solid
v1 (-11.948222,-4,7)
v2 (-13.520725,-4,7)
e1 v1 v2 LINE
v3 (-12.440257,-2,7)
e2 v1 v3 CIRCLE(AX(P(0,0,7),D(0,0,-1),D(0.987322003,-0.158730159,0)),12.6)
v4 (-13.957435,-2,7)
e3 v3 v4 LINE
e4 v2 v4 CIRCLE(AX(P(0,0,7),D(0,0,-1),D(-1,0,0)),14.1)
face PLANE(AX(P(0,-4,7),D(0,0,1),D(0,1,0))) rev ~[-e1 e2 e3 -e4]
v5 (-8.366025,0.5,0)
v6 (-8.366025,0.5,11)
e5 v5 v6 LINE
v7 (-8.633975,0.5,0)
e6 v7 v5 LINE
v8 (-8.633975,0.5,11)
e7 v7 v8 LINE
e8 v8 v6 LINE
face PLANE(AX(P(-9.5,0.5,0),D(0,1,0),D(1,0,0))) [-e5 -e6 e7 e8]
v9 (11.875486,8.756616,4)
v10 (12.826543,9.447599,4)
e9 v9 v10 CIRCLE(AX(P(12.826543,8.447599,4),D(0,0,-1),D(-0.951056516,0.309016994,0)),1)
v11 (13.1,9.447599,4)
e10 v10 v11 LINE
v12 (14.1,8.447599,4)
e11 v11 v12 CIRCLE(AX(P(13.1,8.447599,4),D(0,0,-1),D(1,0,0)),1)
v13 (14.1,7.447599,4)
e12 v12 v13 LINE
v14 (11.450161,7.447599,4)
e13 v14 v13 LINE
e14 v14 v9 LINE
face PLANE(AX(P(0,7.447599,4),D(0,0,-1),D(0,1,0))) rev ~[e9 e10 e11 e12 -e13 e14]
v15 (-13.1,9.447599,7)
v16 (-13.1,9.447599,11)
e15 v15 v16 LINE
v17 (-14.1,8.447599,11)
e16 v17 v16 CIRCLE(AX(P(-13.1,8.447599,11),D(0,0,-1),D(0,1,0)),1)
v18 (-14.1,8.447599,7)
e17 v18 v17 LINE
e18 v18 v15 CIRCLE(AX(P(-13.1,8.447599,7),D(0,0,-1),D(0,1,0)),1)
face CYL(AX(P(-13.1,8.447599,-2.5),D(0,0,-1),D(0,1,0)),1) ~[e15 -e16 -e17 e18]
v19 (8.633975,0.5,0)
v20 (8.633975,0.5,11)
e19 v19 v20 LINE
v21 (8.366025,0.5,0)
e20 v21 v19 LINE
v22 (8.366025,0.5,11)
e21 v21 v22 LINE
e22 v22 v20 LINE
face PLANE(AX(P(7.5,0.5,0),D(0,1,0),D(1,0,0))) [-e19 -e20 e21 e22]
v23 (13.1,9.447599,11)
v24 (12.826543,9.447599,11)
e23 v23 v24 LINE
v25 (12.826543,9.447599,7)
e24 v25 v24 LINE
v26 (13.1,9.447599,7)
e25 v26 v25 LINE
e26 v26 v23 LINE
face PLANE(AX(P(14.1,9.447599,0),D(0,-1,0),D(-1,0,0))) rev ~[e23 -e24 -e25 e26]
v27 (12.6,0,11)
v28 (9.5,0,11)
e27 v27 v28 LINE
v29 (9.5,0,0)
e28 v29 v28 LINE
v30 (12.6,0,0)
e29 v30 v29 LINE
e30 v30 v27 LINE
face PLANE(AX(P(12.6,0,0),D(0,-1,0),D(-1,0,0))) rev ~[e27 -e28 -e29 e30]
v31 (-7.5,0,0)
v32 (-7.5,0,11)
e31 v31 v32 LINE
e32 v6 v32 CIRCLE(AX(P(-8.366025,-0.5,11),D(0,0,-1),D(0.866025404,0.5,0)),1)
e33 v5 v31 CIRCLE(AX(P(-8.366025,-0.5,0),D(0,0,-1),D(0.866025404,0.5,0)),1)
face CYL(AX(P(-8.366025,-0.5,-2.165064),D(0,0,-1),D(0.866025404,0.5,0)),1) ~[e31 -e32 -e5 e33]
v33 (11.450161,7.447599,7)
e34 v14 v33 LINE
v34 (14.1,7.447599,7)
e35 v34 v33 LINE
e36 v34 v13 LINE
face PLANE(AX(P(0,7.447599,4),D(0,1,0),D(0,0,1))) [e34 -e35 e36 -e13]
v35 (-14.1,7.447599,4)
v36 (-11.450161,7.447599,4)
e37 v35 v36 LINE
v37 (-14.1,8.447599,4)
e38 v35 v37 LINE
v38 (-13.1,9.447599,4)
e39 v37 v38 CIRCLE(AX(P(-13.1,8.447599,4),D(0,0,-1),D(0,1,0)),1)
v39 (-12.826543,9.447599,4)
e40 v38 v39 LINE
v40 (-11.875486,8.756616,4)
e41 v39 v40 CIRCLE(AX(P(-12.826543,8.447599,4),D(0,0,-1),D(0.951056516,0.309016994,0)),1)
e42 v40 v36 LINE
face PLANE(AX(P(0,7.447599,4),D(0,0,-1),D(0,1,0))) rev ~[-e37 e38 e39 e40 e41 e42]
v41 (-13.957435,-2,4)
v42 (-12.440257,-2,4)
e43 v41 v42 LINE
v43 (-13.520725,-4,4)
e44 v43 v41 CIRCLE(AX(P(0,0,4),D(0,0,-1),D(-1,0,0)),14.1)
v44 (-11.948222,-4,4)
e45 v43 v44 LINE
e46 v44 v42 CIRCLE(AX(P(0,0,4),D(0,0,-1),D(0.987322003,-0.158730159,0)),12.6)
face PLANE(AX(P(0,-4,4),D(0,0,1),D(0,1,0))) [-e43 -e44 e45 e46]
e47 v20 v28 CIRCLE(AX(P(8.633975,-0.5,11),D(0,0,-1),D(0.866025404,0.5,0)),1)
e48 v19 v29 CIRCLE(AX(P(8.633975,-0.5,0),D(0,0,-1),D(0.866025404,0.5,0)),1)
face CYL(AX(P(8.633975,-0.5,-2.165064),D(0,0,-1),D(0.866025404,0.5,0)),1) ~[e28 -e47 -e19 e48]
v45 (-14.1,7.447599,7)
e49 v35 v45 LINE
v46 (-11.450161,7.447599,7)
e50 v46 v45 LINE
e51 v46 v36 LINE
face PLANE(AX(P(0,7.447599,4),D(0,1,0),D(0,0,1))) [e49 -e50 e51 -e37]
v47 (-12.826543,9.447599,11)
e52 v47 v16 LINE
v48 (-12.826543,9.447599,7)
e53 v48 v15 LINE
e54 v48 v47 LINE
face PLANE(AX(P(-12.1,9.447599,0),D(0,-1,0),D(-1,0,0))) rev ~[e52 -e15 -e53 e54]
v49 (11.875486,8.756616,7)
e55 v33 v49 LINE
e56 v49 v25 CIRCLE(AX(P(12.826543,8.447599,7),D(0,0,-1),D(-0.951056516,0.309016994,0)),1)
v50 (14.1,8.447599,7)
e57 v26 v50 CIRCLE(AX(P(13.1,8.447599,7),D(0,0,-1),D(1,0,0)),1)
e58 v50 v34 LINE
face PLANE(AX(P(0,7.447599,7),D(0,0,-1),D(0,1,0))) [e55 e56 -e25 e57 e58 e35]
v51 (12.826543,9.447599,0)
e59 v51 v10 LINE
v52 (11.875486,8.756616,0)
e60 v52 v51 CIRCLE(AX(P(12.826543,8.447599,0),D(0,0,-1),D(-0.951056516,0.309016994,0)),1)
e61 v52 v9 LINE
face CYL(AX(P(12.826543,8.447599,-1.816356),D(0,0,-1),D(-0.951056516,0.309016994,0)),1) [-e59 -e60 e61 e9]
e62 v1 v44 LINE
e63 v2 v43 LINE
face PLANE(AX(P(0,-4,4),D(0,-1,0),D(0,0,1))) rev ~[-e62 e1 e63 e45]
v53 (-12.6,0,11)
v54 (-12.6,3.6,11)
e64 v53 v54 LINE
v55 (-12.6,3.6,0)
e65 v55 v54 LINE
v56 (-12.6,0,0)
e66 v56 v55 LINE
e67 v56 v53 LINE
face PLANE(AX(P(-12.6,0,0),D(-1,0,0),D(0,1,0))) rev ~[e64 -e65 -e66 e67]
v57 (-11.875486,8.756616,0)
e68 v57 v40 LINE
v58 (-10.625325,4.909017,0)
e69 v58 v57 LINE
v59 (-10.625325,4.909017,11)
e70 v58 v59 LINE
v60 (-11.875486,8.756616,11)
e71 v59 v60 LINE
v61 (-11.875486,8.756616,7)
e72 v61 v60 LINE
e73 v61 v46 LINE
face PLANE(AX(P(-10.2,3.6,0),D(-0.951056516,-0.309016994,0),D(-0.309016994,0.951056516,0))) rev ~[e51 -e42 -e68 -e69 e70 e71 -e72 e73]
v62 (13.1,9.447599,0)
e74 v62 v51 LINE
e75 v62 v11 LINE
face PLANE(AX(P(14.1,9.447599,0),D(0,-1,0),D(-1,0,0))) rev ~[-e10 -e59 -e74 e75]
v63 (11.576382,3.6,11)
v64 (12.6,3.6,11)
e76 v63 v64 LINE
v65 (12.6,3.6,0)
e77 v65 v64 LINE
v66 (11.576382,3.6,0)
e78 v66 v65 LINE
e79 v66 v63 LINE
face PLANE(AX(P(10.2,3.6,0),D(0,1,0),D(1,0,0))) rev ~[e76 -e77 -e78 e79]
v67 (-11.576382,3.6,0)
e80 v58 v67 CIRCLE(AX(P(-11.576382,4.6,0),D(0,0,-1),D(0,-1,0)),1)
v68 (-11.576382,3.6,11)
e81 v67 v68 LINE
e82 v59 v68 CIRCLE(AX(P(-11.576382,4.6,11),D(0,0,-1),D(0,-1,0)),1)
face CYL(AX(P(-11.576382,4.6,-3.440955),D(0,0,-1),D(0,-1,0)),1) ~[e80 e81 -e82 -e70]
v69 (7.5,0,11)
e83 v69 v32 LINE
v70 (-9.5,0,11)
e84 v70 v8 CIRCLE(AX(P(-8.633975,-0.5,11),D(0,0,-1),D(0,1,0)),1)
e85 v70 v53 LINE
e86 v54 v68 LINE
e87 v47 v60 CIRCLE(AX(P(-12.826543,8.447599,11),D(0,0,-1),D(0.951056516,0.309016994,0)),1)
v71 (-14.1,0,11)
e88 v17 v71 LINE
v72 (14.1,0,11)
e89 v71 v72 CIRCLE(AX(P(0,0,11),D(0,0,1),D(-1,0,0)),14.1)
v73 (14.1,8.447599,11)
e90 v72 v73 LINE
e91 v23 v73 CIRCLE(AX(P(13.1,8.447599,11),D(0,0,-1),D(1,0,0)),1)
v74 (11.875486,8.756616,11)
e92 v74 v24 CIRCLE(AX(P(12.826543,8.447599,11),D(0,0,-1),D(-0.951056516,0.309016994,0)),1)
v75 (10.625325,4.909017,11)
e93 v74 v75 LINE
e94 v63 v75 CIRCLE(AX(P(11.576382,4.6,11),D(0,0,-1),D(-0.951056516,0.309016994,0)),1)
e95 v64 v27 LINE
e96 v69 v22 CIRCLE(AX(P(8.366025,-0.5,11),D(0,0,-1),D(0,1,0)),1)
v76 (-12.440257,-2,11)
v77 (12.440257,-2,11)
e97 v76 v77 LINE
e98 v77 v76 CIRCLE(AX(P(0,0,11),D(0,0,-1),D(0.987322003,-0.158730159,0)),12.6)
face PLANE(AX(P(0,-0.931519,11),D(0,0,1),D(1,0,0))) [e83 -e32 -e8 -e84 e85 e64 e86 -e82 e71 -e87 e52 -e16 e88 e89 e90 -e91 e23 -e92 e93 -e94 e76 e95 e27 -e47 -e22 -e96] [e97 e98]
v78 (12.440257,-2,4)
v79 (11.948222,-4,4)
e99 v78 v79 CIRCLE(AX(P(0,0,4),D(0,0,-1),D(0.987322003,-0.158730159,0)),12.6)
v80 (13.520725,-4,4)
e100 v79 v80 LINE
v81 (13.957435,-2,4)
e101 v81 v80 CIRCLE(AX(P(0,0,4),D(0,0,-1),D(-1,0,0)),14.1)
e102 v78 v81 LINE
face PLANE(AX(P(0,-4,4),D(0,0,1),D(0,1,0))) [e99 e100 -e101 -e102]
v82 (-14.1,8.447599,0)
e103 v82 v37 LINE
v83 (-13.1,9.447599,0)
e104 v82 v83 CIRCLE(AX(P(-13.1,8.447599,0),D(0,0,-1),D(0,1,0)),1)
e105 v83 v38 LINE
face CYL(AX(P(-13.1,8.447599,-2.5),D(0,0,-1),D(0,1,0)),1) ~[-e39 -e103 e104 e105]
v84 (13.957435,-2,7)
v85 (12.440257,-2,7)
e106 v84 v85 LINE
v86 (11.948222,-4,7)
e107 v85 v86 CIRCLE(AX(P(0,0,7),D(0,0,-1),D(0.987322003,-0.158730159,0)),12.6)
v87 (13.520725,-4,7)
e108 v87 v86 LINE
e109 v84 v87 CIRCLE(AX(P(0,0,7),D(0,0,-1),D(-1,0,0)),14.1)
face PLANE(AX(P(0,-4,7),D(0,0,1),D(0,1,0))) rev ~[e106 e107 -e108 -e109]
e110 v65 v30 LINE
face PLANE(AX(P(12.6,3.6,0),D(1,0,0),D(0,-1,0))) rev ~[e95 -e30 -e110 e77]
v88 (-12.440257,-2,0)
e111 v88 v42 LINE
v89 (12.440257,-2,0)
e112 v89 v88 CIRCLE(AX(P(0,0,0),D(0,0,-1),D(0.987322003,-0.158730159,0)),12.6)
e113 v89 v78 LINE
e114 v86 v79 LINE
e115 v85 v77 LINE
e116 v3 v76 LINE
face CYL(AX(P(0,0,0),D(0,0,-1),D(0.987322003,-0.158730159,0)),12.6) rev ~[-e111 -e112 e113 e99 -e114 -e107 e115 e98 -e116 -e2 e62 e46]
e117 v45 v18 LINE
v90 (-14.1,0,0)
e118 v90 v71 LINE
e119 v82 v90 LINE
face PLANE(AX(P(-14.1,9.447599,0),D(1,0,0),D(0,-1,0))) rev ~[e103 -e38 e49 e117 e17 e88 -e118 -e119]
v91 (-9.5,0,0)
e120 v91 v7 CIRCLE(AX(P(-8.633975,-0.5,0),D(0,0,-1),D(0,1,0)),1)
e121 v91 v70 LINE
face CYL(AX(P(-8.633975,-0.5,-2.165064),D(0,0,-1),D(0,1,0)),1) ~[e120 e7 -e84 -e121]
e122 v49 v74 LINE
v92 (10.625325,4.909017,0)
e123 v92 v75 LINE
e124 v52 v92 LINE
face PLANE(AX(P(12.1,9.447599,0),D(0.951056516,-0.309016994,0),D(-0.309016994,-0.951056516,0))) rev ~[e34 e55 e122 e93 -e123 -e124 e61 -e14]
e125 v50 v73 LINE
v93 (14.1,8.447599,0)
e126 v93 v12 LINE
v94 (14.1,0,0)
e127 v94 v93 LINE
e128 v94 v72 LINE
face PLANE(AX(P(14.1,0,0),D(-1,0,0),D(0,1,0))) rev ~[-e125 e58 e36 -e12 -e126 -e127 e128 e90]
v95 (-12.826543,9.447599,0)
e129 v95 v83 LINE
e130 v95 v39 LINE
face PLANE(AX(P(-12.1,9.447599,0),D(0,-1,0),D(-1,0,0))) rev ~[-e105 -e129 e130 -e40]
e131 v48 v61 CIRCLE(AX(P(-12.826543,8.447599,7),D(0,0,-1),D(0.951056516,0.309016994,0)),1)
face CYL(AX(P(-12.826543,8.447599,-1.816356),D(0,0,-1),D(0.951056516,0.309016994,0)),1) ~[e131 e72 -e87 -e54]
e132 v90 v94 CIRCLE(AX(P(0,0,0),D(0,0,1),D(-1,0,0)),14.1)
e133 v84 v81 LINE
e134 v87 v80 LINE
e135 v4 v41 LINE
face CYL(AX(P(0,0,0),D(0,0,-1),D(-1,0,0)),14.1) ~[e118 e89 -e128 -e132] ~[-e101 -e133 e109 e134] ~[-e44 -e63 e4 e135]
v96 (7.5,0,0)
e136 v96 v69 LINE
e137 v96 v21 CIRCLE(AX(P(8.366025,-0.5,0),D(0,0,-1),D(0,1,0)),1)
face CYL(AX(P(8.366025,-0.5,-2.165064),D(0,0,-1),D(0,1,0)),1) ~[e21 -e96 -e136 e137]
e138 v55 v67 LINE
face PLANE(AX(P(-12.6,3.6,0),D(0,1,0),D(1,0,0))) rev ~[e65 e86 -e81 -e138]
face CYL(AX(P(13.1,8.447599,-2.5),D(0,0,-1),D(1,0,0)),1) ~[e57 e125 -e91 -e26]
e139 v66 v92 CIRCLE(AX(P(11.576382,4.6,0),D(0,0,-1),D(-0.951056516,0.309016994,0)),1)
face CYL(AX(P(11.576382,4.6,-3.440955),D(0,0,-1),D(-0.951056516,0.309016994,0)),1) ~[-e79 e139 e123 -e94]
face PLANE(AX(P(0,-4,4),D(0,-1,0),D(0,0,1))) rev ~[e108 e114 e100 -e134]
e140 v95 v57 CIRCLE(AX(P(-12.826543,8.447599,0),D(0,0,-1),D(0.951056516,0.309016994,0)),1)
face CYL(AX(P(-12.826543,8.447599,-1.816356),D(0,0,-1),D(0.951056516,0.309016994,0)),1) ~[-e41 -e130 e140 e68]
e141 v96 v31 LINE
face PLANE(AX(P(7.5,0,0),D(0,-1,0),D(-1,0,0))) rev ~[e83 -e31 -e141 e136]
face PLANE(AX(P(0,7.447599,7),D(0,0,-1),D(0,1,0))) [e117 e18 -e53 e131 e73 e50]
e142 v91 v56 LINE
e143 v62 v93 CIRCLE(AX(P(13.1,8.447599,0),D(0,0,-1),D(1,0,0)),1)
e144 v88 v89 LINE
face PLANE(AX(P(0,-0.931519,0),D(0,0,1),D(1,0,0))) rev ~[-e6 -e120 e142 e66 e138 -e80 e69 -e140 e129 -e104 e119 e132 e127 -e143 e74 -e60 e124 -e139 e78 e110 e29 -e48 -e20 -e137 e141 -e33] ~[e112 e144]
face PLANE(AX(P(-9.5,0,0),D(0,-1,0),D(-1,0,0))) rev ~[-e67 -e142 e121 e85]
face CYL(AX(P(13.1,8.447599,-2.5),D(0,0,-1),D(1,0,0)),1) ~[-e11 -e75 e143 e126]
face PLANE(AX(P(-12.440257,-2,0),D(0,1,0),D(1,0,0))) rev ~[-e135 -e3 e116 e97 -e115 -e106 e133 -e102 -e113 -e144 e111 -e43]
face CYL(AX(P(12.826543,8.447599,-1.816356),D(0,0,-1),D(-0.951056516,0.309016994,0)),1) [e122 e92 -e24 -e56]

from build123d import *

# Parameters (mm, degrees)
F0_W        = 2
F0_H        = 0.5
F1_DEPTH    = 11
F2_T1_DEPTH = 17.8819096024
F2_T3_DEPTH = 16
F2_T5_DEPTH = 14.63271264
F2_T7_DEPTH = 15.3301270189
F3_W        = 2
F3_H        = 3
F4_DEPTH    = 15


# Not quite as in the source:
# - a fillet or chamfer that OpenCascade refuses, or shapes differently, is made with other operations: its cross-section is extruded or revolved along the edge and cut away or added


with BuildPart() as f1:
    # F0 (on Top) → F1 (new body)
    with BuildSketch(Plane.XY):
        with BuildLine():
            Line((-14.1, 9.4475987206), (-14.1, 0))
            ThreePointArc((-14.1, 0), (0, -14.1), (14.1, 0))
            Line((14.1, 0), (14.1, 9.4475987206))
            Line((14.1, 9.4475987206), (12.1, 9.4475987206))
            Line((12.1, 9.4475987206), (10.2, 3.6))
            Line((10.2, 3.6), (12.6, 3.6))
            Line((12.6, 3.6), (12.6, 0))
            Line((12.6, 0), (9.5, 0))
            Line((9.5, 0), (7.5, 0))
            Line((7.5, 0), (0, 0))
            Line((0, 0), (-7.5, 0))
            Line((-7.5, 0), (-9.5, 0))
            Line((-9.5, 0), (-12.6, 0))
            Line((-12.6, 0), (-12.6, 3.6))
            Line((-12.6, 3.6), (-10.2, 3.6))
            Line((-10.2, 3.6), (-12.1, 9.4475987206))
            Line((-12.1, 9.4475987206), (-14.1, 9.4475987206))
        make_face()
        with BuildLine():
            ThreePointArc((12.4402572321, -2), (0, -12.6), (-12.4402572321, -2))
            Line((-12.4402572321, -2), (12.4402572321, -2))
        make_face(mode=Mode.SUBTRACT)
        with Locations((-8.5, 0.25)):
            Rectangle(F0_W, F0_H)
        with Locations((8.5, 0.25)):
            Rectangle(F0_W, F0_H)
    extrude(amount=F1_DEPTH)

    # F2: fillet of radius 1 on 10 edges, made by hand

    # F2_s2 → F2_t1 (cut)
    with BuildSketch(Plane.XY.offset(-3.4409548012)):
        with BuildLine():
            ThreePointArc((-11.5763819205, 3.6), (-10.7673649261, 4.0122147477), (-10.6253254042, 4.9090169944))
            Line((-10.6253254042, 4.9090169944), (-10.2, 3.6))
            Line((-10.2, 3.6), (-11.5763819205, 3.6))
        make_face()
        with BuildLine():
            ThreePointArc((10.6253254042, 4.9090169944), (10.7673649261, 4.0122147477), (11.5763819205, 3.6))
            Line((11.5763819205, 3.6), (10.2, 3.6))
            Line((10.2, 3.6), (10.6253254042, 4.9090169944))
        make_face()
    extrude(amount=F2_T1_DEPTH, mode=Mode.SUBTRACT)

    # F2_s4 → F2_t3 (cut)
    with BuildSketch(Plane.XY.offset(-2.5)):
        with BuildLine():
            ThreePointArc((-13.1, 9.4475987206), (-13.8071067812, 9.1547055018), (-14.1, 8.4475987206))
            Line((-14.1, 8.4475987206), (-14.1, 9.4475987206))
            Line((-14.1, 9.4475987206), (-13.1, 9.4475987206))
        make_face()
        with BuildLine():
            ThreePointArc((14.1, 8.4475987206), (13.8071067812, 9.1547055018), (13.1, 9.4475987206))
            Line((13.1, 9.4475987206), (14.1, 9.4475987206))
            Line((14.1, 9.4475987206), (14.1, 8.4475987206))
        make_face()
    extrude(amount=F2_T3_DEPTH, mode=Mode.SUBTRACT)

    # F2_s6 → F2_t5 (cut)
    with BuildSketch(Plane.XY.offset(-1.81635632)):
        with BuildLine():
            ThreePointArc((-11.8754860117, 8.756615715), (-12.2387572757, 9.256615715), (-12.826542528, 9.4475987206))
            Line((-12.826542528, 9.4475987206), (-12.1, 9.4475987206))
            Line((-12.1, 9.4475987206), (-11.8754860117, 8.756615715))
        make_face()
        with BuildLine():
            ThreePointArc((11.8754860117, 8.756615715), (12.2387572757, 9.256615715), (12.826542528, 9.4475987206))
            Line((12.826542528, 9.4475987206), (12.1, 9.4475987206))
            Line((12.1, 9.4475987206), (11.8754860117, 8.756615715))
        make_face()
    extrude(amount=F2_T5_DEPTH, mode=Mode.SUBTRACT)

    # F2_s8 → F2_t7 (cut)
    with BuildSketch(Plane.XY.offset(-2.1650635095)):
        with BuildLine():
            ThreePointArc((-8.6339745962, 0.5), (-9.1339745962, 0.3660254038), (-9.5, 0))
            Line((-9.5, 0), (-9.5, 0.5))
            Line((-9.5, 0.5), (-8.6339745962, 0.5))
        make_face()
        with BuildLine():
            ThreePointArc((-7.5, 0), (-7.8660254038, 0.3660254038), (-8.3660254038, 0.5))
            Line((-8.3660254038, 0.5), (-7.5, 0.5))
            Line((-7.5, 0.5), (-7.5, 0))
        make_face()
        with BuildLine():
            ThreePointArc((8.3660254038, 0.5), (7.8660254038, 0.3660254038), (7.5, 0))
            Line((7.5, 0), (7.5, 0.5))
            Line((7.5, 0.5), (8.3660254038, 0.5))
        make_face()
        with BuildLine():
            ThreePointArc((9.5, 0), (9.1339745962, 0.3660254038), (8.6339745962, 0.5))
            Line((8.6339745962, 0.5), (9.5, 0.5))
            Line((9.5, 0.5), (9.5, 0))
        make_face()
    extrude(amount=F2_T7_DEPTH, mode=Mode.SUBTRACT)

    # F3 (on Right) → F4 (cut, symmetric)
    with BuildSketch(Plane.YZ):
        with Locations((-3, 5.5)):
            Rectangle(F3_W, F3_H)
        with Locations((8.4475987206, 5.5)):
            Rectangle(F3_W, F3_H)
    extrude(amount=F4_DEPTH, both=True, mode=Mode.SUBTRACT)


solid = f1.part
